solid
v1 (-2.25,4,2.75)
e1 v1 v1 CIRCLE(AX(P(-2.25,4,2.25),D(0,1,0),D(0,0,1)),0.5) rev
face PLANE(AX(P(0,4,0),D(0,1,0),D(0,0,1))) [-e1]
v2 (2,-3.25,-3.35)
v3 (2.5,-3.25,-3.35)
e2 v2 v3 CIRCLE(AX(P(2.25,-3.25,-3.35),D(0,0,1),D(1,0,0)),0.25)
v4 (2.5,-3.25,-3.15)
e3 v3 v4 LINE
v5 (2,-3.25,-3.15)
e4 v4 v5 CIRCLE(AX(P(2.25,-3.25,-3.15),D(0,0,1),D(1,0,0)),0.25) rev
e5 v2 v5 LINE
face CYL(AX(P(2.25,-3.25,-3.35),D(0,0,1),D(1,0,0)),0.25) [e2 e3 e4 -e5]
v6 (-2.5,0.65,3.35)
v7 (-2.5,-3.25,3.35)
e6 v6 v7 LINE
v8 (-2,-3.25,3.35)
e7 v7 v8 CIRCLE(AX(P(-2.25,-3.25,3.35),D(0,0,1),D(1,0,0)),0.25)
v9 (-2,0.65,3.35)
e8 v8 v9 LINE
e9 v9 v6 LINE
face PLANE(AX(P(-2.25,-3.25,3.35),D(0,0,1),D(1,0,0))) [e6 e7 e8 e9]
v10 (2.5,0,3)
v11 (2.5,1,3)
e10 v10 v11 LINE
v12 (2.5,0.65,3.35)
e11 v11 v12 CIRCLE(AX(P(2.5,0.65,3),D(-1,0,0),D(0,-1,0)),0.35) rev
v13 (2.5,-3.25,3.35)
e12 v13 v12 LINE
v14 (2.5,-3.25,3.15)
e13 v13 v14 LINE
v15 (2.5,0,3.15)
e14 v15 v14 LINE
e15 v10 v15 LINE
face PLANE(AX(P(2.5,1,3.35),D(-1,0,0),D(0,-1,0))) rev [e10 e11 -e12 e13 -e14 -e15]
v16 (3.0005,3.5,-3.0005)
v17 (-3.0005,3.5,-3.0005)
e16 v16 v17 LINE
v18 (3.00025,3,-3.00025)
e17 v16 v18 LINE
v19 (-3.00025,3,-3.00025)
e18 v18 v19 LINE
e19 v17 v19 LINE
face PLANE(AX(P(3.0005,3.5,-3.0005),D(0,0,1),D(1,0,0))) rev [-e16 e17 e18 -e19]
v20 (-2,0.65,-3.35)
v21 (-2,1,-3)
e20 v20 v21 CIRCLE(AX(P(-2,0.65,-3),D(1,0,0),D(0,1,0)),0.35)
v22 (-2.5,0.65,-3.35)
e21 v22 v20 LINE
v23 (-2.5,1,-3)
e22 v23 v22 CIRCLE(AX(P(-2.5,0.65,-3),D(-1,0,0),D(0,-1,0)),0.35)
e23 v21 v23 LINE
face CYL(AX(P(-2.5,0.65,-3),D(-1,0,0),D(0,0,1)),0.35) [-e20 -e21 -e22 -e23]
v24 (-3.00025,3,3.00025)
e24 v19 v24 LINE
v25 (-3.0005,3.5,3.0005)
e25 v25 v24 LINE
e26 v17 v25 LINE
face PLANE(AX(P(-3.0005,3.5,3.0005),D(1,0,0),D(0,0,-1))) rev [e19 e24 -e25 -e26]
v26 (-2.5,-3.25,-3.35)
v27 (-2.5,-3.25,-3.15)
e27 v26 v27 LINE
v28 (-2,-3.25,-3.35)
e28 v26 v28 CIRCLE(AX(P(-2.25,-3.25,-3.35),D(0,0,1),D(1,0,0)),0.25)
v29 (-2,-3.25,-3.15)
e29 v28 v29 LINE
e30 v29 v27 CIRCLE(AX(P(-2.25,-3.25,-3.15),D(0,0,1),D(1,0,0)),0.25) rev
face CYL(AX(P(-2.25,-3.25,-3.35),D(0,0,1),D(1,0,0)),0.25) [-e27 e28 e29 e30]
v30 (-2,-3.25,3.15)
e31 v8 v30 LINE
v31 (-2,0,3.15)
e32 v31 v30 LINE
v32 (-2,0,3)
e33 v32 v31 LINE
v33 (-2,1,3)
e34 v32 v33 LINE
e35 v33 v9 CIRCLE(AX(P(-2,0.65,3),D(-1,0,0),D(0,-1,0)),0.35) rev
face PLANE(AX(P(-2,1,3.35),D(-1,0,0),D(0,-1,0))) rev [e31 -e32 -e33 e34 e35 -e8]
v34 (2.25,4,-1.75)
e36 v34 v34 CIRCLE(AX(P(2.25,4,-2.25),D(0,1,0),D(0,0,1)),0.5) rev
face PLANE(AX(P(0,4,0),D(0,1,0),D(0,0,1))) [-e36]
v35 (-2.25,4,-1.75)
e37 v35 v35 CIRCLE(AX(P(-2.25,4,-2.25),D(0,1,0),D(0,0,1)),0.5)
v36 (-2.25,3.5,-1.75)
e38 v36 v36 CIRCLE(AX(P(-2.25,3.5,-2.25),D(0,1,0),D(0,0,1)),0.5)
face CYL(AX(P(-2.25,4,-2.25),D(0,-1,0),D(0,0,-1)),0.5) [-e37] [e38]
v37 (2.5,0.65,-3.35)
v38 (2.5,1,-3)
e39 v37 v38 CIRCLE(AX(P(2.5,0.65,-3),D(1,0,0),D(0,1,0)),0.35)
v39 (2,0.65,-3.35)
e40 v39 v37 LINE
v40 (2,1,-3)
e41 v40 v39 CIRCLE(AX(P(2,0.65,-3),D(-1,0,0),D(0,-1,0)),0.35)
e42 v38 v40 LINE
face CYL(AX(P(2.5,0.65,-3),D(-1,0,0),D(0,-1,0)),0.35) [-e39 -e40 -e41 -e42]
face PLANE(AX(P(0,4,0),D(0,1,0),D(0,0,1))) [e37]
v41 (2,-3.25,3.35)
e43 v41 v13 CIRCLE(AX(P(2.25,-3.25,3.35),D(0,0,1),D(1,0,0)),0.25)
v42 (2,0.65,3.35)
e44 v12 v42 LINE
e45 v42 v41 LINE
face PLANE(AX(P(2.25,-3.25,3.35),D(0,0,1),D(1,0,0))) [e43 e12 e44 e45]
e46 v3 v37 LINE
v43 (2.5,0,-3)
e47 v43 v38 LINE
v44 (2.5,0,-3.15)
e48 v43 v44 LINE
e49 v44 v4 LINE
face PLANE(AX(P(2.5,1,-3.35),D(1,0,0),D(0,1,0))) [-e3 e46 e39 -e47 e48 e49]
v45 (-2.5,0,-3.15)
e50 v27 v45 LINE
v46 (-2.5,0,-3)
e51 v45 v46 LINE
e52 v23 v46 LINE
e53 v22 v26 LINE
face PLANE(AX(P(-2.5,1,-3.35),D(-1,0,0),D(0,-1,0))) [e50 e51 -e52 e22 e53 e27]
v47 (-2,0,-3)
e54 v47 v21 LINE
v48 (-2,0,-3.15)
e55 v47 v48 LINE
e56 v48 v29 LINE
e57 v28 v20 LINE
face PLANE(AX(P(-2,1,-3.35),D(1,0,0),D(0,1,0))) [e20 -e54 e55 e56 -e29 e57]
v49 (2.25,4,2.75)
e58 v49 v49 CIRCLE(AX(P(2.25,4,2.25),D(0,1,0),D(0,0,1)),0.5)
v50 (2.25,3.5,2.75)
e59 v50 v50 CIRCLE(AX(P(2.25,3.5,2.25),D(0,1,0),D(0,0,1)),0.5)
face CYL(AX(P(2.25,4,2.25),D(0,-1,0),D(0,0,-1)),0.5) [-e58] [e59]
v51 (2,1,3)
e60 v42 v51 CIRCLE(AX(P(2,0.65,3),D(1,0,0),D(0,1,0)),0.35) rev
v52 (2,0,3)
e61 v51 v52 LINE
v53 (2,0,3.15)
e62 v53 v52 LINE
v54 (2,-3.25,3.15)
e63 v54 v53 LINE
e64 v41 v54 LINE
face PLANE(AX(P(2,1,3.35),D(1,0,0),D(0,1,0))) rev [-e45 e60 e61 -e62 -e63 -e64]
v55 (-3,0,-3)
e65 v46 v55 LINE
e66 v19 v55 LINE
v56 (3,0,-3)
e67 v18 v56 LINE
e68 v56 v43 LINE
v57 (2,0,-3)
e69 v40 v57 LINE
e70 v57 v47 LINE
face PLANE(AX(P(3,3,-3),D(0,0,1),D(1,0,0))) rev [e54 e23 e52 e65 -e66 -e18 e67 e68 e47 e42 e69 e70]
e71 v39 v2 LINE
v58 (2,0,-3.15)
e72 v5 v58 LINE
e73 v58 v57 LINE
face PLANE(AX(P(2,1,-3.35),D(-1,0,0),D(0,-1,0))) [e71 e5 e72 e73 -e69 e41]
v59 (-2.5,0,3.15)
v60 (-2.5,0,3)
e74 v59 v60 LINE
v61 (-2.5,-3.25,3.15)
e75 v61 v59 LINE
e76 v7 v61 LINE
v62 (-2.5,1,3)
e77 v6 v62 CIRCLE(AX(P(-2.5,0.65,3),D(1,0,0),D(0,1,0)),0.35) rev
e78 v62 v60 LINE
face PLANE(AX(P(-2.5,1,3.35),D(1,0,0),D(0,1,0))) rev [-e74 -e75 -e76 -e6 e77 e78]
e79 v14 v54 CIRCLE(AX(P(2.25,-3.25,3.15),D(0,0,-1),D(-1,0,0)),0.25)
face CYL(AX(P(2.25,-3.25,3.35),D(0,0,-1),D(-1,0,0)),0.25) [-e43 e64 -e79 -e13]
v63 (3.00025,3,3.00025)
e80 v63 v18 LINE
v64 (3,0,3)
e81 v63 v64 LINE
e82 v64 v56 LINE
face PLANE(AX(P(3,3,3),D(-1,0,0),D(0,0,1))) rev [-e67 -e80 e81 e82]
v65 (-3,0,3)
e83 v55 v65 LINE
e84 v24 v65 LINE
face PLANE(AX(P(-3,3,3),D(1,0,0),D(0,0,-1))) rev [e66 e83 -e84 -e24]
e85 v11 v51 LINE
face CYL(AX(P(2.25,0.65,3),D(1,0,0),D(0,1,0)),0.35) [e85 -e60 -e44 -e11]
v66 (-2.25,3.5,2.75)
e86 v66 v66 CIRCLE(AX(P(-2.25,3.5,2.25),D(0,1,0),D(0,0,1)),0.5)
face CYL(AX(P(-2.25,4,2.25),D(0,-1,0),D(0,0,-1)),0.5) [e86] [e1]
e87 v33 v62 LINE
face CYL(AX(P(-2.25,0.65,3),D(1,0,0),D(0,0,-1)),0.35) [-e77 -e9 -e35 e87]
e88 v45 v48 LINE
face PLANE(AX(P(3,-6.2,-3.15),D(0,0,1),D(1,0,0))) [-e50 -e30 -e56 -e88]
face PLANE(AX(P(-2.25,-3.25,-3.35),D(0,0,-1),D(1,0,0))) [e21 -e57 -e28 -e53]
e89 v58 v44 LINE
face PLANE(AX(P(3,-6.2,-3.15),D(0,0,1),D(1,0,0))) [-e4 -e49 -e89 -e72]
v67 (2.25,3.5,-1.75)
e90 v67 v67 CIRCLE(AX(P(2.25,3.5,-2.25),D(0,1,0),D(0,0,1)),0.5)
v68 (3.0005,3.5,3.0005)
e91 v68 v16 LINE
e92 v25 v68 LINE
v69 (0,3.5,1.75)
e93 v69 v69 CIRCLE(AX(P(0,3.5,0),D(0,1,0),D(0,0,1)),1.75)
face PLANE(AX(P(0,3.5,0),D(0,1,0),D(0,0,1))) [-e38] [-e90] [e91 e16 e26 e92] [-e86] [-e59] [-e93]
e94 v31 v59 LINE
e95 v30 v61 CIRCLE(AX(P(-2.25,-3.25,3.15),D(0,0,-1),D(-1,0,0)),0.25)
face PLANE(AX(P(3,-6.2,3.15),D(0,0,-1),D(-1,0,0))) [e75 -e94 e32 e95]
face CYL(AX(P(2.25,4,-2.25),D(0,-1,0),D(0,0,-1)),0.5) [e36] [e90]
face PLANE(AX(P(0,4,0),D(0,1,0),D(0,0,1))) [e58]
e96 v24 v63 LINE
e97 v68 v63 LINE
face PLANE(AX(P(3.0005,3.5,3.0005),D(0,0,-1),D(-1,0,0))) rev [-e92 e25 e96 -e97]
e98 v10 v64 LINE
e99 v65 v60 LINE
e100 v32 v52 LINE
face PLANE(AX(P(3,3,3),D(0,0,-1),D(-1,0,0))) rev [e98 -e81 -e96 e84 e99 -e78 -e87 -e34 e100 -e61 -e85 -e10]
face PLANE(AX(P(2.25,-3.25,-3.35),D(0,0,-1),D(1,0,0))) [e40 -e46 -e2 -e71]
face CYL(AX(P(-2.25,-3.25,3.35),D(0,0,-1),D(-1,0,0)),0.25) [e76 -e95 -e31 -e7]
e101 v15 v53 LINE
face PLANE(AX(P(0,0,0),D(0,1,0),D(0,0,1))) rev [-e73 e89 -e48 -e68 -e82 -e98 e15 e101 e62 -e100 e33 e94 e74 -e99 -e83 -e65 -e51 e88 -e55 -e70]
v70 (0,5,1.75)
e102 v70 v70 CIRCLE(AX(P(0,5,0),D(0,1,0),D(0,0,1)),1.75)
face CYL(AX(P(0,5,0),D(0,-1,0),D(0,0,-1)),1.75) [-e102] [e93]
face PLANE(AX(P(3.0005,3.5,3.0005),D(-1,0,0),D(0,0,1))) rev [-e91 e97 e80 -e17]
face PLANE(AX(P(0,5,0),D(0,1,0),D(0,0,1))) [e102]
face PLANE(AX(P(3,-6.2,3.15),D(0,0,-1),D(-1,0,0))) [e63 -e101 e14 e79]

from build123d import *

# Parameters (mm, degrees)
CROQUIS3_W               = 6
CROQUIS3_H               = 6
SALIENTE_EXTRUIR4_DEPTH  = 3
CROQUIS6_W               = 6.001
CROQUIS6_H               = 6.001
SALIENTE_EXTRUIR9_DEPTH  = 0.5
CROQUIS7_R               = 0.5
SALIENTE_EXTRUIR10_DEPTH = 0.5
CROQUIS7_3_R             = 1.75
SALIENTE_EXTRUIR11_DEPTH = 1.5
SALIENTE_EXTRUIR12_DEPTH = 0.35
REDONDEO3_R              = 0.35
REDONDEO3_OF_SIMETR_A4_R = 0.35
CROQUIS11_W              = 6
CROQUIS11_H              = 6.3
CORTAR_EXTRUIR1_DEPTH    = 6.2


with BuildPart() as part:
    # Croquis3 → Saliente-Extruir4 (new body)
    with BuildSketch(Plane(origin=(0, 0, 0), x_dir=(1, 0, 0), z_dir=(0, 1, 0))):
        Rectangle(CROQUIS3_W, CROQUIS3_H)
    extrude(amount=SALIENTE_EXTRUIR4_DEPTH)

    # Croquis6 → Saliente-Extruir9 (add)
    with BuildSketch(Plane(origin=(0, 3, 0), x_dir=(1, 0, 0), z_dir=(0, 1, 0))):
        Rectangle(CROQUIS6_W, CROQUIS6_H)
    extrude(amount=SALIENTE_EXTRUIR9_DEPTH)

    # Croquis7 → Saliente-Extruir10 (add)
    with BuildSketch(Plane(origin=(0, 3.5, 0), x_dir=(1, 0, 0), z_dir=(0, 1, 0))):
        with Locations(Location((-2.25, -2.25, 0), (0, 0, 270))):
            Circle(CROQUIS7_R)
        with Locations(Location((-2.25, 2.25, 0), (0, 0, 270))):
            Circle(CROQUIS7_R)
        with Locations(Location((2.25, 2.25, 0), (0, 0, 270))):
            Circle(CROQUIS7_R)
        with Locations(Location((2.25, -2.25, 0), (0, 0, 270))):
            Circle(CROQUIS7_R)
    extrude(amount=SALIENTE_EXTRUIR10_DEPTH)

    # Croquis7<3> → Saliente-Extruir11 (add)
    with BuildSketch(Plane(origin=(0, 3.5, 0), x_dir=(1, 0, 0), z_dir=(0, 1, 0))):
        with Locations(Location((0, 0, 0), (0, 0, 270))):
            Circle(CROQUIS7_3_R)
    extrude(amount=SALIENTE_EXTRUIR11_DEPTH)

    # Croquis8 → Saliente-Extruir12 (add)
    with BuildSketch(Plane.XY.offset(3)):
        with BuildLine():
            Line((-2.5, 1), (-2, 1))
            Line((-2, 1), (-2, -3.25))
            ThreePointArc((-2, -3.25), (-2.25, -3.5), (-2.5, -3.25))
            Line((-2.5, -3.25), (-2.5, 1))
        make_face()
        with BuildLine():
            Line((2, 1), (2, -3.25))
            ThreePointArc((2, -3.25), (2.25, -3.5), (2.5, -3.25))
            Line((2.5, -3.25), (2.5, 1))
            Line((2.5, 1), (2, 1))
        make_face()
    saliente_extruir12 = extrude(amount=SALIENTE_EXTRUIR12_DEPTH)

    # Redondeo3
    redondeo3_edges = [part.edges().sort_by_distance(p)[0] for p in [
        (-2.25, 1, 3.35),
        (2.25, 1, 3.35),
    ]]
    fillet(redondeo3_edges, radius=REDONDEO3_R - 0.0001)  # a hair under: the kernel refuses the full size

    # Simetría4: Saliente-Extruir12 across plane
    add(saliente_extruir12.mirror(Plane.XY))

    # Redondeo3 of Simetría4
    redondeo3_of_simetr_a4_edges = [part.edges().sort_by_distance(p)[0] for p in [
        (-2.25, 1, -3.35),
        (2.25, 1, -3.35),
    ]]
    fillet(redondeo3_of_simetr_a4_edges, radius=REDONDEO3_OF_SIMETR_A4_R - 0.0001)  # a hair under: the kernel refuses the full size

    # Croquis11 → Cortar-Extruir1 (cut)
    with BuildSketch(Plane.XZ):
        Rectangle(CROQUIS11_W, CROQUIS11_H)
    extrude(amount=CORTAR_EXTRUIR1_DEPTH, mode=Mode.SUBTRACT)


solid = part.part
